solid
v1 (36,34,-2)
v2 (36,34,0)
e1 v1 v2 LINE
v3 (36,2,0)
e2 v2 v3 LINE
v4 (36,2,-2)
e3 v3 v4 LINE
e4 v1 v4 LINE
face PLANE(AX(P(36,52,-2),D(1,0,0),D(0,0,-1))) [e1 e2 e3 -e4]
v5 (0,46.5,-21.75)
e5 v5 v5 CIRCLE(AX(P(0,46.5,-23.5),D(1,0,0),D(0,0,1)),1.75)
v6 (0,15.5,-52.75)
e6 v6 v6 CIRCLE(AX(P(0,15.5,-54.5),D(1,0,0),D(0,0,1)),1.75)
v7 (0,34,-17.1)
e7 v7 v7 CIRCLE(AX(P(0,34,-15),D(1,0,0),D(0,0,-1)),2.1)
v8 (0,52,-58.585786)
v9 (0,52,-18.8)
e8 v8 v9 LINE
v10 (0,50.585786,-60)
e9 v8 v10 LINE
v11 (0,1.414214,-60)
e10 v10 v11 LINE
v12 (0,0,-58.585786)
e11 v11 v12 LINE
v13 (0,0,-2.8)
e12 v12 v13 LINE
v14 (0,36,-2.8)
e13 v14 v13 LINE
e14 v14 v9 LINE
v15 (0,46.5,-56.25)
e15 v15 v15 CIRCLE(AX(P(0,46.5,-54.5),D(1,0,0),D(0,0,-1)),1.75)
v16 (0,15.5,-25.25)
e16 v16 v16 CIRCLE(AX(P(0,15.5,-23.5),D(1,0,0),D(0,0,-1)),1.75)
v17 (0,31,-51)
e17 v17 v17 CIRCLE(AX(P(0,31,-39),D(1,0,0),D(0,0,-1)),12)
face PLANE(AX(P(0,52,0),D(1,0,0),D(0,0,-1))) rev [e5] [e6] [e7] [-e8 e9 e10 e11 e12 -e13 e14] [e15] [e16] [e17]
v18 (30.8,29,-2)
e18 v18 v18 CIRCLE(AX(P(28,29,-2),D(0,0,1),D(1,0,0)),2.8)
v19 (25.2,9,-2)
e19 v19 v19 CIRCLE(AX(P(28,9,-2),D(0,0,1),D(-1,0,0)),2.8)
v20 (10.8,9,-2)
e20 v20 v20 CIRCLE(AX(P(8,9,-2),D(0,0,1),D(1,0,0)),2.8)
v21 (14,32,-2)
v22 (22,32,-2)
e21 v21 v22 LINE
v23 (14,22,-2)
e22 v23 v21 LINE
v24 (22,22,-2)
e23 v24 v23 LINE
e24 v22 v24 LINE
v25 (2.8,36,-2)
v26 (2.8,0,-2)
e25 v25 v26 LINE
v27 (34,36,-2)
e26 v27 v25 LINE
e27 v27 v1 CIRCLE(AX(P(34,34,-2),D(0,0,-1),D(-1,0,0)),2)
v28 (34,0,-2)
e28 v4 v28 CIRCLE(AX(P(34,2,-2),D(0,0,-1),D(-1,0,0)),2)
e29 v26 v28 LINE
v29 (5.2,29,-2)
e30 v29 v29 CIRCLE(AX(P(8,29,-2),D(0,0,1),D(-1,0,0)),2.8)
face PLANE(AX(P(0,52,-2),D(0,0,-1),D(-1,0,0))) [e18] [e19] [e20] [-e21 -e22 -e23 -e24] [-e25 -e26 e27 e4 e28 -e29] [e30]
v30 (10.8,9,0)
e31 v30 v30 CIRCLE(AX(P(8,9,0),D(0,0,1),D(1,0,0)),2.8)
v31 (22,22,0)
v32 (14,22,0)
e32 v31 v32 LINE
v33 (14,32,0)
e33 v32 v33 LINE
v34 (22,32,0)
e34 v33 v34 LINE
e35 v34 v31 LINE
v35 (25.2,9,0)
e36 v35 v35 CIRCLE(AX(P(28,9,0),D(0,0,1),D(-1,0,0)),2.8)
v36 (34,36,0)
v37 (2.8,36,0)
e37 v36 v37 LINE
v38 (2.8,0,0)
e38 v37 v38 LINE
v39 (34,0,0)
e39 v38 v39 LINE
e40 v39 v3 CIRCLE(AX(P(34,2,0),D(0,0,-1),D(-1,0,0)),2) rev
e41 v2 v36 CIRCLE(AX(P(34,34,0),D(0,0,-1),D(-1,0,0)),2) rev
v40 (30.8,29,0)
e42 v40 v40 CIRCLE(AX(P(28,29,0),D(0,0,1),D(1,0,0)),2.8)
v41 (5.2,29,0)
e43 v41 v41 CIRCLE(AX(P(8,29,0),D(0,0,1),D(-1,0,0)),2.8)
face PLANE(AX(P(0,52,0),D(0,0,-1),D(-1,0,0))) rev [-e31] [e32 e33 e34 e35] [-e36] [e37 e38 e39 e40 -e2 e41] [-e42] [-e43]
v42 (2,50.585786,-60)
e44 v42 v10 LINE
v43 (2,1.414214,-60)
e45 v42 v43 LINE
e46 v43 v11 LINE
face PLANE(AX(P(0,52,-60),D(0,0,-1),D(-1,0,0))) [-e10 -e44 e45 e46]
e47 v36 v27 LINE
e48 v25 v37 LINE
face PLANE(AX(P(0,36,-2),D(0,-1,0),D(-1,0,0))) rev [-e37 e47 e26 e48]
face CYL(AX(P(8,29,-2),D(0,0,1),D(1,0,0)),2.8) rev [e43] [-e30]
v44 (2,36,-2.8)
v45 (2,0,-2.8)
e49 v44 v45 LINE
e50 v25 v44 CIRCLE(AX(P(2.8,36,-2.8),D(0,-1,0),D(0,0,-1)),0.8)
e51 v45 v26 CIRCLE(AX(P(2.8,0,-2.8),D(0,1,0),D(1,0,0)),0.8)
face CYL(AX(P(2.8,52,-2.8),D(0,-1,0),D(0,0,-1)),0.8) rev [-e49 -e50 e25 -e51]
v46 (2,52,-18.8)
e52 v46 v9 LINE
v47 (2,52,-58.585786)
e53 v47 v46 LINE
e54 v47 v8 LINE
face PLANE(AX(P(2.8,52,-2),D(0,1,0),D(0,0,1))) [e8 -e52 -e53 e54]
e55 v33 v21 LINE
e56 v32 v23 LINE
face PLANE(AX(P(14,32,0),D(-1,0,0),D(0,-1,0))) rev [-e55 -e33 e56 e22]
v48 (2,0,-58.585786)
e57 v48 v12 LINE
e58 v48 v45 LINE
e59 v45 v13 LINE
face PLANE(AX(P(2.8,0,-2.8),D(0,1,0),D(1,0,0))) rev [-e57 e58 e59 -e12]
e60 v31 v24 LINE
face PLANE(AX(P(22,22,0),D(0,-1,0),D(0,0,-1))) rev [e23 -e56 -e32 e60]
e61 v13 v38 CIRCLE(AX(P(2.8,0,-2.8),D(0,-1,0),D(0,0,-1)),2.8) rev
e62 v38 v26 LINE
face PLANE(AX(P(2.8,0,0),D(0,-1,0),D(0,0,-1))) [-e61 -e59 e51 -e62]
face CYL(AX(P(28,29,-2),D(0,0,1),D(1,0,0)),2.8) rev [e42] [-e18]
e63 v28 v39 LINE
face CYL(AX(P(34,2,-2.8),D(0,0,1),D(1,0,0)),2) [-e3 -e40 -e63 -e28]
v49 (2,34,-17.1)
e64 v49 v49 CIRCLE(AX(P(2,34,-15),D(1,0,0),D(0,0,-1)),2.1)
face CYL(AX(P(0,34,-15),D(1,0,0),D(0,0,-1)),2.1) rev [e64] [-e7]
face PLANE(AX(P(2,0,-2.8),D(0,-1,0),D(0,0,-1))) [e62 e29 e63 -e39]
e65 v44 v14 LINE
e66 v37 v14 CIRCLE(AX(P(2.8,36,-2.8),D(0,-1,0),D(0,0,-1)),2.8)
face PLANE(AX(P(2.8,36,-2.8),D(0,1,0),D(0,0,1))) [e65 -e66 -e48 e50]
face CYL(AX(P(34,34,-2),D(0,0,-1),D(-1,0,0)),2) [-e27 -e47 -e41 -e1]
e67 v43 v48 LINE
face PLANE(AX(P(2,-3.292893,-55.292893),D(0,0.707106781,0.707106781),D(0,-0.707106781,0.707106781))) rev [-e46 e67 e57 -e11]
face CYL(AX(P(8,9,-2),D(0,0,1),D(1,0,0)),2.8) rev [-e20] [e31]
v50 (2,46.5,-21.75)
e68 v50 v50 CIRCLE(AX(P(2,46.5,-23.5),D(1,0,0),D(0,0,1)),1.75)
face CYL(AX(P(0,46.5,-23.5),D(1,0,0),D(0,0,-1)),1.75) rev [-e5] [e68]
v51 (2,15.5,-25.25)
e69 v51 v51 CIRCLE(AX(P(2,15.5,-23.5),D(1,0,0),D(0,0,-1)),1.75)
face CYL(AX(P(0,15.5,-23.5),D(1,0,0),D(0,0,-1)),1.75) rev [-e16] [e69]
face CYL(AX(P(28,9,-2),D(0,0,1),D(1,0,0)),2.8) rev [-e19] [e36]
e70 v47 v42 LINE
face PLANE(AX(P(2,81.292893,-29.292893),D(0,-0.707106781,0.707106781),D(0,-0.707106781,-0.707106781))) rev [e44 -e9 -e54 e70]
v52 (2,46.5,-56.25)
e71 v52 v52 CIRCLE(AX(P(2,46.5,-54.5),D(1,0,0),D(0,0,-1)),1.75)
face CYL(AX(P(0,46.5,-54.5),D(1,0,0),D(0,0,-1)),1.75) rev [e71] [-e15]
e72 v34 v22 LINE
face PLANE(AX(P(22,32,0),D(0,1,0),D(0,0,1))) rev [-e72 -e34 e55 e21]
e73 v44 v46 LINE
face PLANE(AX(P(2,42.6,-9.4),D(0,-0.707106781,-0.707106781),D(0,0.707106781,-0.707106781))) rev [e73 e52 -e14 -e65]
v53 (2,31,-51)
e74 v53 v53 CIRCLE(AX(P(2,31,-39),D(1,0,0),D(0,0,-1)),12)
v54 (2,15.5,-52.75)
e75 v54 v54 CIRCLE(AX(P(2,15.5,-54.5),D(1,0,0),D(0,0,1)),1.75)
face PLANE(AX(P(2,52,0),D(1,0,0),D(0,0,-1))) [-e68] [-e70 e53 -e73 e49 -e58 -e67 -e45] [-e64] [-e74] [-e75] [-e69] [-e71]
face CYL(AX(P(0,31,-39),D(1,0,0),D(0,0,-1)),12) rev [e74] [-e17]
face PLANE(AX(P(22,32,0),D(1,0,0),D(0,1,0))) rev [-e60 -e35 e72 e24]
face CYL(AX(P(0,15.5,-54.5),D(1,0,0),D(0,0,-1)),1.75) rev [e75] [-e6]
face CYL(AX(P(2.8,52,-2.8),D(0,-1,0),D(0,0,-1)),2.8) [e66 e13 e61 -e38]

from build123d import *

# Parameters (mm, degrees)
BASE_FLANGE1_DEPTH = 52
CUT_EXTRUDE1_DEPTH = 88.177978871
FILLET1_R          = 2
SKETCH7_R          = 12
SKETCH7_R_2        = 1.75
CUT_EXTRUDE2_DEPTH = 10
SKETCH8_R          = 2.8
CUT_EXTRUDE3_DEPTH = 2
SKETCH9_W          = 8
SKETCH9_H          = 10
CUT_EXTRUDE4_DEPTH = 10
SKETCH10_R         = 2.1
CUT_EXTRUDE5_DEPTH = 10


# Sheet-metal steps are written as plain solids
with BuildPart() as part:
    # Sketch1 → Base-Flange1 (new body)
    with BuildSketch(Plane(origin=(0, 0, 0), x_dir=(1, 0, 0), z_dir=(0, 1, 0))):
        with BuildLine():
            Line((36, 0), (2.8, 0))
            ThreePointArc((2.8, 0), (0.820101013, 0.820101013), (0, 2.8))
            Line((0, 2.8), (0, 60))
            Line((0, 60), (2, 60))
            Line((2, 60), (2, 2.8))
            ThreePointArc((2, 2.8), (2.234314575, 2.234314575), (2.8, 2))
            Line((2.8, 2), (36, 2))
            Line((36, 2), (36, 0))
        make_face()
    extrude(amount=BASE_FLANGE1_DEPTH)

    # Sketch6 → Cut-Extrude1 (cut, through all)
    with BuildSketch(Plane.ZY):
        Polygon((-18.8, 52), (-2.8, 36), (0, 36), (0, 52), align=None)
        Polygon((-60, 52), (-58.585786438, 52), (-60, 50.585786438), align=None)
        Polygon((-60, 1.414213562), (-60, 0), (-58.585786438, 0), align=None)
    extrude(amount=-CUT_EXTRUDE1_DEPTH, mode=Mode.SUBTRACT)

    # Fillet1
    fillet1_edges = [part.edges().sort_by_distance(p)[0] for p in [
        (36, 36, -1),
        (36, 0, -1),
    ]]
    fillet(fillet1_edges, radius=FILLET1_R)

    # Sketch7 → Cut-Extrude2 (cut)
    with BuildSketch(Plane(origin=(2, 0, 0), x_dir=(0, 0, -1), z_dir=(1, 0, 0))):
        with Locations((39, 31)):
            Circle(SKETCH7_R)
        with Locations((54.5, 46.5)):
            Circle(SKETCH7_R_2)
        with Locations(Location((23.5, 46.5, 0), (0, 0, 180))):
            Circle(SKETCH7_R_2)
        with Locations(Location((54.5, 15.5, 0), (0, 0, 180))):
            Circle(SKETCH7_R_2)
        with Locations((23.5, 15.5)):
            Circle(SKETCH7_R_2)
    extrude(amount=-CUT_EXTRUDE2_DEPTH, mode=Mode.SUBTRACT)

    # Sketch8 → Cut-Extrude3 (cut)
    with BuildSketch(Plane.XY):
        with Locations((28, 29)):
            Circle(SKETCH8_R)
        with Locations(Location((28, 9, 0), (0, 0, 180))):
            Circle(SKETCH8_R)
        with Locations((8, 9)):
            Circle(SKETCH8_R)
        with Locations(Location((8, 29, 0), (0, 0, 180))):
            Circle(SKETCH8_R)
    extrude(amount=-CUT_EXTRUDE3_DEPTH, mode=Mode.SUBTRACT)

    # Sketch9 → Cut-Extrude4 (cut)
    with BuildSketch(Plane(origin=(0, 0, -2), x_dir=(-1, 0, 0), z_dir=(0, 0, -1))):
        with Locations((-18, 27)):
            Rectangle(SKETCH9_W, SKETCH9_H)
    extrude(amount=-CUT_EXTRUDE4_DEPTH, mode=Mode.SUBTRACT)

    # Sketch10 → Cut-Extrude5 (cut)
    with BuildSketch(Plane(origin=(2, 0, 0), x_dir=(0, 0, -1), z_dir=(1, 0, 0))):
        with Locations((15, 34)):
            Circle(SKETCH10_R)
    extrude(amount=-CUT_EXTRUDE5_DEPTH, mode=Mode.SUBTRACT)


solid = part.part
